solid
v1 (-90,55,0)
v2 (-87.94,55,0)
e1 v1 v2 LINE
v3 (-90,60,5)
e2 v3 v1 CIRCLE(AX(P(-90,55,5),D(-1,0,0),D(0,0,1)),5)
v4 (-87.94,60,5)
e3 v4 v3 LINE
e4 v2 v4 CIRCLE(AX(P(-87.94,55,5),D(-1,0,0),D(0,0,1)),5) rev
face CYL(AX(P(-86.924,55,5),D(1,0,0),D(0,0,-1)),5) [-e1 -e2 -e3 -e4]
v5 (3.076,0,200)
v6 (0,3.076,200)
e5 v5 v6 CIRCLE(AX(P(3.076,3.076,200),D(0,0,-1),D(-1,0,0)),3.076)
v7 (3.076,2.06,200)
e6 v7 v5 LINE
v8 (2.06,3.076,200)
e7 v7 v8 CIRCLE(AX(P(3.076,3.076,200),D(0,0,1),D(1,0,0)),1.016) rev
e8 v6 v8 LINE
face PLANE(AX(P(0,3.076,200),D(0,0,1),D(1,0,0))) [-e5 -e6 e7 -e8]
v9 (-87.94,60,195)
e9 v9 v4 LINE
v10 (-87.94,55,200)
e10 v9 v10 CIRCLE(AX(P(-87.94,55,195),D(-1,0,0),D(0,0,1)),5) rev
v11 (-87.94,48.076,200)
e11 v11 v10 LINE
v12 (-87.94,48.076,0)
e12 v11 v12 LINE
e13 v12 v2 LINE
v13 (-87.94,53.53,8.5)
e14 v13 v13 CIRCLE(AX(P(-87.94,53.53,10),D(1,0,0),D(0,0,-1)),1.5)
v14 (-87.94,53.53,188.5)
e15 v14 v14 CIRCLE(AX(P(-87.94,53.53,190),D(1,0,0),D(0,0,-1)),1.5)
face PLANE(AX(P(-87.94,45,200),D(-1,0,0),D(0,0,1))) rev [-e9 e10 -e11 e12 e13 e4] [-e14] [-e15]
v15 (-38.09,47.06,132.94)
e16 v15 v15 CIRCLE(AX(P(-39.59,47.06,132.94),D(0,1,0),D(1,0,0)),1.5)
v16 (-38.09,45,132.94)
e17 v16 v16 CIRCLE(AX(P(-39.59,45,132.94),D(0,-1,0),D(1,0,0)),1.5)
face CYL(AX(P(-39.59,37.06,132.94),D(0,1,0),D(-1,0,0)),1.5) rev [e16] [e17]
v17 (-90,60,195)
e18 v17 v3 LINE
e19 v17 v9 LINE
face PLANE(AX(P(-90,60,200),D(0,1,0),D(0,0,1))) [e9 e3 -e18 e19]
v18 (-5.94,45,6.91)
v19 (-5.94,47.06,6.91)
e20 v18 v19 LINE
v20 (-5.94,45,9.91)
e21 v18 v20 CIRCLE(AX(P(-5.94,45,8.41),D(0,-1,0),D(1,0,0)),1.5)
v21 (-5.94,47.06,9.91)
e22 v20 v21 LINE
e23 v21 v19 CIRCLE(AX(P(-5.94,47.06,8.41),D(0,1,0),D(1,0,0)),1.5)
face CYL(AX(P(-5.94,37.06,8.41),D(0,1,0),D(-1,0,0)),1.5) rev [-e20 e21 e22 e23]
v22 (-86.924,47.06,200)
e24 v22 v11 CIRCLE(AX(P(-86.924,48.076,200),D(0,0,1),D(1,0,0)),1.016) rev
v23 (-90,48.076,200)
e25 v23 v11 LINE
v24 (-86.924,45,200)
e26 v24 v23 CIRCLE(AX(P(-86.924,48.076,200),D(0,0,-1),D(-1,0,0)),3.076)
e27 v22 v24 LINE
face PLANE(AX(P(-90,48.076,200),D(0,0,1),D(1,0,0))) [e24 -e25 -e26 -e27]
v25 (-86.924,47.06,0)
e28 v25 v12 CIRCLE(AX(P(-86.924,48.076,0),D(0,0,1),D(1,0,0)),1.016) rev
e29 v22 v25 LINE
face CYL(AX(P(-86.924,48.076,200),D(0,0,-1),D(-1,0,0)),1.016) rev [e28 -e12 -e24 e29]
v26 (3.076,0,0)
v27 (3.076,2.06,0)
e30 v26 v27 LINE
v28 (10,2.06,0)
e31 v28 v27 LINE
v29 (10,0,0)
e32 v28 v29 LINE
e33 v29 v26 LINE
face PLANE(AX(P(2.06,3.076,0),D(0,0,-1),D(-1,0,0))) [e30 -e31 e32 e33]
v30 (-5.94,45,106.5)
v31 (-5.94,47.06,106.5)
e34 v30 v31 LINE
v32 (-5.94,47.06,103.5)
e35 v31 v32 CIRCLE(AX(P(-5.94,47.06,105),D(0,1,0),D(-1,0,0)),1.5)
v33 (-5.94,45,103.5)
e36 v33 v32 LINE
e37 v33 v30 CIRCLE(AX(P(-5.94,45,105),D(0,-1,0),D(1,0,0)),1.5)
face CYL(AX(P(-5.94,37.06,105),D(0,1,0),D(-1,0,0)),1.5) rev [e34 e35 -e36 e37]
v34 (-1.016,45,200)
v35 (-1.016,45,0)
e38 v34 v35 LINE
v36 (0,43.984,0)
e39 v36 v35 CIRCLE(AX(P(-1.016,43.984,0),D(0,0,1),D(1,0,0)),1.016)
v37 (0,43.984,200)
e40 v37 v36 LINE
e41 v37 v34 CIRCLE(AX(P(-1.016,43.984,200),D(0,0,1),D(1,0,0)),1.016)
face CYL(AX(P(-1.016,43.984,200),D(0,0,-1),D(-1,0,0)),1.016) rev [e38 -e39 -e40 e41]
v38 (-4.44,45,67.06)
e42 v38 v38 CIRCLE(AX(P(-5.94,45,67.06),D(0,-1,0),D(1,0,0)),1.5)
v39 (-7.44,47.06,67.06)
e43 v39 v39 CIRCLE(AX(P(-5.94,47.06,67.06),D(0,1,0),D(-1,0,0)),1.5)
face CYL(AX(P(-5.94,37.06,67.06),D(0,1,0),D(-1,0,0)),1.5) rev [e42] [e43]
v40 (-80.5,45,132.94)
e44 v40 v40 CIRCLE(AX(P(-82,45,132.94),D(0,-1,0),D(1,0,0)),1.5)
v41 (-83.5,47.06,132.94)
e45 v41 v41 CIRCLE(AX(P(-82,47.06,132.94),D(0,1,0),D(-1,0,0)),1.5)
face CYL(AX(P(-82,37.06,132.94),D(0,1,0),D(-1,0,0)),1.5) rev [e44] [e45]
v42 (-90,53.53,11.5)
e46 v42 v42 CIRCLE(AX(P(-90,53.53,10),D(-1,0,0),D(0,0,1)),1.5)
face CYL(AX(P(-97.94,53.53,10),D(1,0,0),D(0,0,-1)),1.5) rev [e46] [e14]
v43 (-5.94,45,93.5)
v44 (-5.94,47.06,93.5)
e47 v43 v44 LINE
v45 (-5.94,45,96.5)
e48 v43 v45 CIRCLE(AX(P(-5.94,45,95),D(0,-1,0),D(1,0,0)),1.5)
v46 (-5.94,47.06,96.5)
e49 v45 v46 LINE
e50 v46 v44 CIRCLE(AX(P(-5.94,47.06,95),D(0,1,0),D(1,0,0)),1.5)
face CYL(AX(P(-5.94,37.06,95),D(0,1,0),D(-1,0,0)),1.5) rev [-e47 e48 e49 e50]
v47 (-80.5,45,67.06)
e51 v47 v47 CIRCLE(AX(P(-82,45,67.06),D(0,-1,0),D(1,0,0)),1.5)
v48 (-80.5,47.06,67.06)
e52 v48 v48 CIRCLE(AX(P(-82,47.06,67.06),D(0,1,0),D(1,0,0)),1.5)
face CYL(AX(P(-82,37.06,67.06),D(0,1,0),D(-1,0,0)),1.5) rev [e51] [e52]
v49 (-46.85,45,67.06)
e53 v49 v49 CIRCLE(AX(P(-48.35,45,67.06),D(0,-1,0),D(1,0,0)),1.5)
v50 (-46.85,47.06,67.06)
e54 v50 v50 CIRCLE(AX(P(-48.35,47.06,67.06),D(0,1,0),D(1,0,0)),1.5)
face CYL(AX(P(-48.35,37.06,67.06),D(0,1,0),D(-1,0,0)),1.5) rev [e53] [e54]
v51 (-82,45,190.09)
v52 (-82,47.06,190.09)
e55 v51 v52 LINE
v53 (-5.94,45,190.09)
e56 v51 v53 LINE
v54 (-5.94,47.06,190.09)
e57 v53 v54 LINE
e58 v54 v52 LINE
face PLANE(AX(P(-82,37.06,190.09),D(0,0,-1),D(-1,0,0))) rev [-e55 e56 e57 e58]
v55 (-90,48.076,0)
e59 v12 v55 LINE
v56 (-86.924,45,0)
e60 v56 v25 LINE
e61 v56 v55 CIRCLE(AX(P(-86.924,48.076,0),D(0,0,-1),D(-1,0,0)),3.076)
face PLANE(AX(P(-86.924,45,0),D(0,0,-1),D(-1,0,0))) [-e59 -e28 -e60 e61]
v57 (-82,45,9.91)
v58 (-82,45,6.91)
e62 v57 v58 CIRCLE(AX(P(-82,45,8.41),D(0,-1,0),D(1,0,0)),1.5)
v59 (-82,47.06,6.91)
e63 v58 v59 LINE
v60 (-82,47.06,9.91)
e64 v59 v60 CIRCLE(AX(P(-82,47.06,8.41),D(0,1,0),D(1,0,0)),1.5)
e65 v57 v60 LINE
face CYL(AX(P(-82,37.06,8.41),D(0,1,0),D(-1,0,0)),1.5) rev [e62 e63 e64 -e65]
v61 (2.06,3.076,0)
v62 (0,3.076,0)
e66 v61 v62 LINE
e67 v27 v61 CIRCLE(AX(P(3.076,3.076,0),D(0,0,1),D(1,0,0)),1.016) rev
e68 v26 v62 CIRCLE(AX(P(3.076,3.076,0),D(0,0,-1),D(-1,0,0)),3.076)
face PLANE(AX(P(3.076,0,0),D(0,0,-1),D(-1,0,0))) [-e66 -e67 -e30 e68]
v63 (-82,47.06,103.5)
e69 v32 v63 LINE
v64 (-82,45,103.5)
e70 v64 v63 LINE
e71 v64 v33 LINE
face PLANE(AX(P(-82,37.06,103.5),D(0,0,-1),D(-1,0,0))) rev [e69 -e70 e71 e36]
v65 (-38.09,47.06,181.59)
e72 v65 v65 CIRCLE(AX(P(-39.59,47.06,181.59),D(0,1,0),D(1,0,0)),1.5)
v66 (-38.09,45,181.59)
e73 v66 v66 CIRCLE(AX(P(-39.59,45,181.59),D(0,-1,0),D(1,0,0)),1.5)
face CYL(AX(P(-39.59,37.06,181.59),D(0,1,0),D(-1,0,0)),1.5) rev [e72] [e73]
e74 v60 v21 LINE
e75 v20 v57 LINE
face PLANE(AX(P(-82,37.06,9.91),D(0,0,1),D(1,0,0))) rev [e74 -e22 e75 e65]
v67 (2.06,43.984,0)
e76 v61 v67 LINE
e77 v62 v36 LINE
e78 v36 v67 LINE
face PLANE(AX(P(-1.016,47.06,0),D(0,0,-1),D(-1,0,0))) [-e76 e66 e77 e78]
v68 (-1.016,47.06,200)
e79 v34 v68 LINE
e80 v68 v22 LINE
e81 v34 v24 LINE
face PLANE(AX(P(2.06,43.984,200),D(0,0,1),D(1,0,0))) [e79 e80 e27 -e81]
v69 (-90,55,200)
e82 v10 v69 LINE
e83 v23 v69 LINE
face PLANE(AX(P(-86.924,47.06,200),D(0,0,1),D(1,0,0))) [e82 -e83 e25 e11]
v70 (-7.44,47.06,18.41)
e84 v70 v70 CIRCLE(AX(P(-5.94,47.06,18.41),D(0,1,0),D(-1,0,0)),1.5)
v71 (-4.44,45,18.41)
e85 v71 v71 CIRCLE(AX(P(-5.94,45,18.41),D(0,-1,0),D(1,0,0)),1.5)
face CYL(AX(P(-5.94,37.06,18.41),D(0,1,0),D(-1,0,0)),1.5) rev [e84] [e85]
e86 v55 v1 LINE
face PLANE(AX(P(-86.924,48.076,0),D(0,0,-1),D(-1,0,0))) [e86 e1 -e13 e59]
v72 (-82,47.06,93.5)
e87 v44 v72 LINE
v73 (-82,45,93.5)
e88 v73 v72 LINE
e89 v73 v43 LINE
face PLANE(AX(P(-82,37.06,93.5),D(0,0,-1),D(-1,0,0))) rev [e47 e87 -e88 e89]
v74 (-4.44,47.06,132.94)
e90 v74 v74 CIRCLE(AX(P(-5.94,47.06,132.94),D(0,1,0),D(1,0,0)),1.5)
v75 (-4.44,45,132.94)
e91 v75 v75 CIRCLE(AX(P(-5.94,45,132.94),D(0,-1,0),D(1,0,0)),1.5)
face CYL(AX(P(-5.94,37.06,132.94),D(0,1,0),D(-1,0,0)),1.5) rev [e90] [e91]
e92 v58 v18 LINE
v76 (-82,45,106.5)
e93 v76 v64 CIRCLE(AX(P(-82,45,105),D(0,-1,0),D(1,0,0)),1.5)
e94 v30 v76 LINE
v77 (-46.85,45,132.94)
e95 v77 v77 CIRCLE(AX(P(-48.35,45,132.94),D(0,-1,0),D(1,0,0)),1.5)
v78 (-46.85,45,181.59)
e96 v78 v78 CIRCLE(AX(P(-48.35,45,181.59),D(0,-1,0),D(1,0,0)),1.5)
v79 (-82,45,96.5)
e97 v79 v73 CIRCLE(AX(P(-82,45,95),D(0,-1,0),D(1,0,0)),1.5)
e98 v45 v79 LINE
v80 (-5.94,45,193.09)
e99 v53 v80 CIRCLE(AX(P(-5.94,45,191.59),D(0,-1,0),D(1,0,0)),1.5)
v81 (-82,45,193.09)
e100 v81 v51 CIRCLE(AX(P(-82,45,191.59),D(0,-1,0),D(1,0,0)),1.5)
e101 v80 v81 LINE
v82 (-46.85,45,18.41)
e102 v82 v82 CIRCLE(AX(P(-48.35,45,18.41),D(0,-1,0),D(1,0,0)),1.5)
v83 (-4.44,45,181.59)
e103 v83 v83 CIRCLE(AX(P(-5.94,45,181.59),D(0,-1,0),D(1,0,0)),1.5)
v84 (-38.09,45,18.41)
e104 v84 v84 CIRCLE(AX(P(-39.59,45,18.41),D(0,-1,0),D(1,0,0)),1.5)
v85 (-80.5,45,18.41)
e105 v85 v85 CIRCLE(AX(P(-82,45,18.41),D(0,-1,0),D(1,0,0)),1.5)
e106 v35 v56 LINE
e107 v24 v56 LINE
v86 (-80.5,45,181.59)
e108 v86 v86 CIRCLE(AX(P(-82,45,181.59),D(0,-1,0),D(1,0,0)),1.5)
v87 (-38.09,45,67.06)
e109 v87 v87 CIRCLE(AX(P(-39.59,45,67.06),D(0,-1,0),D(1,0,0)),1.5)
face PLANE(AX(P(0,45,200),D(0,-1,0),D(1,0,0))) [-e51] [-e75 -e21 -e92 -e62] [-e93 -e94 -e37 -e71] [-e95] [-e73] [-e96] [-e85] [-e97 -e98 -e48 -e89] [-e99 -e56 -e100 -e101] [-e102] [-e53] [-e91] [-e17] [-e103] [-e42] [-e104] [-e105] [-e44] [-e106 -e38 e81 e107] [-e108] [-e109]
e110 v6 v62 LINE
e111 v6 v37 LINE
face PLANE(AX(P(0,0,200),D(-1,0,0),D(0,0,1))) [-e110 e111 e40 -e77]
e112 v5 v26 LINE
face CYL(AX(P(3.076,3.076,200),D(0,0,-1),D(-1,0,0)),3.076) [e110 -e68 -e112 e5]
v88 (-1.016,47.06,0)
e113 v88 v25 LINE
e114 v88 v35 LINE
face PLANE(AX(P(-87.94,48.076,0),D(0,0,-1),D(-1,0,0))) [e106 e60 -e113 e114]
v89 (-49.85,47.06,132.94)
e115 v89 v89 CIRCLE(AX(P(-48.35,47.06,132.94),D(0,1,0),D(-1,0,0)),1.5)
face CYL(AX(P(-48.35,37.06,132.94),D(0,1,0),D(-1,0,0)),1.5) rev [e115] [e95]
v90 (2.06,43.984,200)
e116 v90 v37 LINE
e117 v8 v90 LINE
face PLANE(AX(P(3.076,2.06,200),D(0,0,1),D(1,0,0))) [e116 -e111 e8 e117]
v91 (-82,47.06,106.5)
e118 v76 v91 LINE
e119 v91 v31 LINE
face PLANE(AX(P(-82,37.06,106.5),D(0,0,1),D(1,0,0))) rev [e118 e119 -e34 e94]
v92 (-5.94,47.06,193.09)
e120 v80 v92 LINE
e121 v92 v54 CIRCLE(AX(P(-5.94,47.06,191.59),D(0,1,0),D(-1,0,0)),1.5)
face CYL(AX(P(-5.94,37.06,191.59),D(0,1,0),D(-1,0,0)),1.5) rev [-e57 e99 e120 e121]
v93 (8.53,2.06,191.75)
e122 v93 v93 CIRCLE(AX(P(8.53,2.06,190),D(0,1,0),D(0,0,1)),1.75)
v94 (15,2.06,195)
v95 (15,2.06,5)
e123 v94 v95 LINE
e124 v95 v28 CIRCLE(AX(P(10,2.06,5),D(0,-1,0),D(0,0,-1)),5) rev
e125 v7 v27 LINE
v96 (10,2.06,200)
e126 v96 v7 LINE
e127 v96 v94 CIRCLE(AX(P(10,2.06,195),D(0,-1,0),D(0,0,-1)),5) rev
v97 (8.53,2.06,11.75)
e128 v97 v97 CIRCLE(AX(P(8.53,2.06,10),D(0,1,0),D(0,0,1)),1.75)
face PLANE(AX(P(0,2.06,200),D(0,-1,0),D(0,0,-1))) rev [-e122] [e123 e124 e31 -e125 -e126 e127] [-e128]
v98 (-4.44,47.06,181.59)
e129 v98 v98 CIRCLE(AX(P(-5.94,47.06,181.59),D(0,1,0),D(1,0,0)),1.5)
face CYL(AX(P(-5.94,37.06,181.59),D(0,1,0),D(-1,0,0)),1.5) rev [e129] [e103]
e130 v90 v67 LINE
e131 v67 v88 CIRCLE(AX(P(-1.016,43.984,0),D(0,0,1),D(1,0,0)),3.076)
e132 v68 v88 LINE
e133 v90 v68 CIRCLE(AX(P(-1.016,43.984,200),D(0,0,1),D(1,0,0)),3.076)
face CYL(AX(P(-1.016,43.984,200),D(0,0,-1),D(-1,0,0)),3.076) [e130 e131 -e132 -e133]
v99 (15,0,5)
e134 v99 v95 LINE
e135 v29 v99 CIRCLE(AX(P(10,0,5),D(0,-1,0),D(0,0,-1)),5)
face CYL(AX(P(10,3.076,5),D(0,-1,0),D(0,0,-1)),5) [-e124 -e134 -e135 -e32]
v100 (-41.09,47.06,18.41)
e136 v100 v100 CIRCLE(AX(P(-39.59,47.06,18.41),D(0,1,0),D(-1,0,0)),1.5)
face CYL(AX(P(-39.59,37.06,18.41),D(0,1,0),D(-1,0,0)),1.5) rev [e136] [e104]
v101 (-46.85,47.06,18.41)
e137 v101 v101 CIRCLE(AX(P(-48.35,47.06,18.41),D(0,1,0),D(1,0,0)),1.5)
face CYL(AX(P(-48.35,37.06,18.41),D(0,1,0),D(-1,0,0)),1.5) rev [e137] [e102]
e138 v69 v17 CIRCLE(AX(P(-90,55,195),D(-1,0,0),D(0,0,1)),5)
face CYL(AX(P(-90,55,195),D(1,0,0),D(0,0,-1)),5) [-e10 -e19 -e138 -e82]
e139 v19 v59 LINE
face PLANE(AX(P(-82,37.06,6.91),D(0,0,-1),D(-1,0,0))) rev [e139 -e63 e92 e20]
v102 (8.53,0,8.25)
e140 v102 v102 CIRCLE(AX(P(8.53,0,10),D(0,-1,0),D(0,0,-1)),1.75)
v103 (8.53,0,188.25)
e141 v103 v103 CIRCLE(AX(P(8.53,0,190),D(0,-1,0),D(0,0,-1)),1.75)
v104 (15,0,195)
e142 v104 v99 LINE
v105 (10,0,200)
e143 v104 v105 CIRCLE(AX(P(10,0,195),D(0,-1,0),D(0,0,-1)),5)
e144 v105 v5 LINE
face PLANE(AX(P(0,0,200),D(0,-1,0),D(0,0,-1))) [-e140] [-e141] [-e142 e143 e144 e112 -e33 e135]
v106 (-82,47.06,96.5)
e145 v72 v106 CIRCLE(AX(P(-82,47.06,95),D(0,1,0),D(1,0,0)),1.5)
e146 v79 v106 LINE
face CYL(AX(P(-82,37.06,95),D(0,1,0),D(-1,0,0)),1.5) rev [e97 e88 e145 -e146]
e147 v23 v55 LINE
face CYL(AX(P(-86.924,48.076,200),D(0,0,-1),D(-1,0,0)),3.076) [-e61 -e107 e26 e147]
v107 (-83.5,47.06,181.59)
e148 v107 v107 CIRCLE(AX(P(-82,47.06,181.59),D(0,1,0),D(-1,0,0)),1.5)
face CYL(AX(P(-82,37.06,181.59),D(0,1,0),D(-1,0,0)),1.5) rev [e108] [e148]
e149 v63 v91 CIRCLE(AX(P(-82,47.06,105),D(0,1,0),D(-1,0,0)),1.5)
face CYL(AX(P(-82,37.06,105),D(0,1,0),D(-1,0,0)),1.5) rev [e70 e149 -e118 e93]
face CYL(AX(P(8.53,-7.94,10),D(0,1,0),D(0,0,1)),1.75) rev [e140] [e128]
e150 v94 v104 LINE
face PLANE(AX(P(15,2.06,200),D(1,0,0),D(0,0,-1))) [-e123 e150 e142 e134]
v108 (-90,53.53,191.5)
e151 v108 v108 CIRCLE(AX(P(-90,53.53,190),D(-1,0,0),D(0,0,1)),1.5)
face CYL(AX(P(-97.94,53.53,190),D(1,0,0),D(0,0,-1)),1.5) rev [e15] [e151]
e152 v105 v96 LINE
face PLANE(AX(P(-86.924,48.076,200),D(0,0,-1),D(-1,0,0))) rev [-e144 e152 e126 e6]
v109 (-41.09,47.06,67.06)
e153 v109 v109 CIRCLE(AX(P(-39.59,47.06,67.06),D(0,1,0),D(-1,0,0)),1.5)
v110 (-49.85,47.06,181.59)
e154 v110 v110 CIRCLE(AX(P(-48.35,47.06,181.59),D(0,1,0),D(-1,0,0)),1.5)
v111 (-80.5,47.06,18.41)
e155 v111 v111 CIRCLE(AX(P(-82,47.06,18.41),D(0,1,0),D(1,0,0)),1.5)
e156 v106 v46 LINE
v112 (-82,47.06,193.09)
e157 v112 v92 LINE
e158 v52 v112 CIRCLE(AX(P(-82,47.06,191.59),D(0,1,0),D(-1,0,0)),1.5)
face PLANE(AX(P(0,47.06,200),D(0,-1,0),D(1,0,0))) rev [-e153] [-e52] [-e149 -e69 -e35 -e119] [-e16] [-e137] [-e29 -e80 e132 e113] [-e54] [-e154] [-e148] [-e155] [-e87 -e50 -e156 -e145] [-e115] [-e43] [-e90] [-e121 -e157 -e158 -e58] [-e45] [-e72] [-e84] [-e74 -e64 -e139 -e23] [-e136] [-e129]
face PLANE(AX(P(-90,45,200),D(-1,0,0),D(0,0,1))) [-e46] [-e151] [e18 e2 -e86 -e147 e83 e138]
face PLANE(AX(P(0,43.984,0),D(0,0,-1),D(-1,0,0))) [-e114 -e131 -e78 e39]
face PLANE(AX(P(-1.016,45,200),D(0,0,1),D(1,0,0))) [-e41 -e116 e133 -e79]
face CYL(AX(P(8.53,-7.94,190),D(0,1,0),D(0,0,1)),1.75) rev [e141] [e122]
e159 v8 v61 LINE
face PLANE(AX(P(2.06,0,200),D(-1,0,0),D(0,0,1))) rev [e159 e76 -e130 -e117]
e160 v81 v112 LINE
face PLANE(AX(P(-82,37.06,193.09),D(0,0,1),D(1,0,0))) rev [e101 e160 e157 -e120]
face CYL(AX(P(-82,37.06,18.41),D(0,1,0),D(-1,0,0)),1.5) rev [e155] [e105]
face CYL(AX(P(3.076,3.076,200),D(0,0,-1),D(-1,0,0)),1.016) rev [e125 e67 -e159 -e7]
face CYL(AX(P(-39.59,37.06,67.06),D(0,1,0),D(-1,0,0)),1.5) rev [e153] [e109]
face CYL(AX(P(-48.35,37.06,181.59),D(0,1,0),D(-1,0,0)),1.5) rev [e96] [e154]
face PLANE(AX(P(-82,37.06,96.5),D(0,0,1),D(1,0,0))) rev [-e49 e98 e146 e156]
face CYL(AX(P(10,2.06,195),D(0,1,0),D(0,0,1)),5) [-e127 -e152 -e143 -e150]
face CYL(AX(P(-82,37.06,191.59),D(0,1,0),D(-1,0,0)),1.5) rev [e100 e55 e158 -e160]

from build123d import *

# Parameters (mm, degrees)
BASE_FLANGE1_DEPTH = 200
SKETCH6_R          = 1.5
CUT_EXTRUDE1_DEPTH = 10
SKETCH7_R          = 1.75
CUT_EXTRUDE2_DEPTH = 10
FILLET1_R          = 5
SKETCH8_R          = 1.5
CUT_EXTRUDE3_DEPTH = 10


# Read off the part's stored shape, not the designer's step: Base-Flange1
with BuildPart() as part:
    # Base-Flange1 outline → Base-Flange1 (new body)
    with BuildSketch(Plane.XY):
        with BuildLine():
            Line((-87.94, 48.076), (-87.94, 60))
            Line((-87.94, 60), (-90, 60))
            Line((-90, 60), (-90, 48.076))
            ThreePointArc((-90, 48.076), (-89.099060459, 45.900939541), (-86.924, 45))
            Line((-86.924, 45), (-1.016, 45))
            ThreePointArc((-1.016, 45), (-0.29757951, 44.70242049), (0, 43.984))
            Line((0, 43.984), (0, 3.076))
            ThreePointArc((0, 3.076), (0.900939541, 0.900939541), (3.076, 0))
            Line((3.076, 0), (15, 0))
            Line((15, 0), (15, 2.06))
            Line((15, 2.06), (3.076, 2.06))
            ThreePointArc((3.076, 2.06), (2.35757951, 2.35757951), (2.06, 3.076))
            Line((2.06, 3.076), (2.06, 43.984))
            ThreePointArc((2.06, 43.984), (1.159060459, 46.159060459), (-1.016, 47.06))
            Line((-1.016, 47.06), (-86.924, 47.06))
            ThreePointArc((-86.924, 47.06), (-87.64242049, 47.35757951), (-87.94, 48.076))
        make_face()
    extrude(amount=BASE_FLANGE1_DEPTH)

    # Sketch6 → Cut-Extrude1 (cut)
    with BuildSketch(Plane(origin=(-87.94, 0, 0), x_dir=(0, 0, -1), z_dir=(1, 0, 0))):
        with Locations((-190, 53.53)):
            Circle(SKETCH6_R)
        with Locations((-10, 53.53)):
            Circle(SKETCH6_R)
    extrude(amount=-CUT_EXTRUDE1_DEPTH, mode=Mode.SUBTRACT)

    # Sketch7 → Cut-Extrude2 (cut)
    with BuildSketch(Plane(origin=(0, 2.06, 0), x_dir=(1, 0, 0), z_dir=(0, 1, 0))):
        with Locations(Location((8.53, -10, 0), (0, 0, 270))):
            Circle(SKETCH7_R)
        with Locations(Location((8.53, -190, 0), (0, 0, 270))):
            Circle(SKETCH7_R)
    extrude(amount=-CUT_EXTRUDE2_DEPTH, mode=Mode.SUBTRACT)

    # Fillet1
    fillet1_edges = [part.edges().sort_by_distance(p)[0] for p in [
        (15, 1.03, 0),
        (-88.97, 60, 0),
        (15, 1.03, 200),
        (-88.97, 60, 200),
    ]]
    fillet(fillet1_edges, radius=FILLET1_R)

    # Sketch8 → Cut-Extrude3 (cut)
    with BuildSketch(Plane(origin=(0, 47.06, 0), x_dir=(1, 0, 0), z_dir=(0, 1, 0))):
        with Locations(Location((-82, -181.59, 0), (0, 0, 180))):
            Circle(SKETCH8_R)
        with Locations(Location((-48.35, -181.59, 0), (0, 0, 180))):
            Circle(SKETCH8_R)
        with Locations(Location((-48.35, -132.94, 0), (0, 0, 180))):
            Circle(SKETCH8_R)
        with Locations(Location((-82, -132.94, 0), (0, 0, 180))):
            Circle(SKETCH8_R)
        with Locations((-5.94, -132.94)):
            Circle(SKETCH8_R)
        with Locations((-39.59, -132.94)):
            Circle(SKETCH8_R)
        with Locations((-39.59, -181.59)):
            Circle(SKETCH8_R)
        with Locations((-5.94, -181.59)):
            Circle(SKETCH8_R)
        with Locations(Location((-5.94, -18.41, 0), (0, 0, 180))):
            Circle(SKETCH8_R)
        with Locations(Location((-39.59, -18.41, 0), (0, 0, 180))):
            Circle(SKETCH8_R)
        with Locations(Location((-39.59, -67.06, 0), (0, 0, 180))):
            Circle(SKETCH8_R)
        with Locations(Location((-5.94, -67.06, 0), (0, 0, 180))):
            Circle(SKETCH8_R)
        with Locations((-82, -67.06)):
            Circle(SKETCH8_R)
        with Locations((-48.35, -67.06)):
            Circle(SKETCH8_R)
        with Locations((-48.35, -18.41)):
            Circle(SKETCH8_R)
        with Locations((-82, -18.41)):
            Circle(SKETCH8_R)
        with BuildLine():
            Line((-82, -190.09), (-5.94, -190.09))
            ThreePointArc((-5.94, -190.09), (-4.44, -191.59), (-5.94, -193.09))
            Line((-5.94, -193.09), (-82, -193.09))
            ThreePointArc((-82, -193.09), (-83.5, -191.59), (-82, -190.09))
        make_face()
        with BuildLine():
            Line((-82, -9.91), (-5.94, -9.91))
            ThreePointArc((-5.94, -9.91), (-4.44, -8.41), (-5.94, -6.91))
            Line((-5.94, -6.91), (-82, -6.91))
            ThreePointArc((-82, -6.91), (-83.5, -8.41), (-82, -9.91))
        make_face()
        with BuildLine():
            Line((-82, -103.5), (-5.94, -103.5))
            ThreePointArc((-5.94, -103.5), (-4.44, -105), (-5.94, -106.5))
            Line((-5.94, -106.5), (-82, -106.5))
            ThreePointArc((-82, -106.5), (-83.5, -105), (-82, -103.5))
        make_face()
        with BuildLine():
            Line((-82, -96.5), (-5.94, -96.5))
            ThreePointArc((-5.94, -96.5), (-4.44, -95), (-5.94, -93.5))
            Line((-5.94, -93.5), (-82, -93.5))
            ThreePointArc((-82, -93.5), (-83.5, -95), (-82, -96.5))
        make_face()
    extrude(amount=-CUT_EXTRUDE3_DEPTH, mode=Mode.SUBTRACT)


solid = part.part
